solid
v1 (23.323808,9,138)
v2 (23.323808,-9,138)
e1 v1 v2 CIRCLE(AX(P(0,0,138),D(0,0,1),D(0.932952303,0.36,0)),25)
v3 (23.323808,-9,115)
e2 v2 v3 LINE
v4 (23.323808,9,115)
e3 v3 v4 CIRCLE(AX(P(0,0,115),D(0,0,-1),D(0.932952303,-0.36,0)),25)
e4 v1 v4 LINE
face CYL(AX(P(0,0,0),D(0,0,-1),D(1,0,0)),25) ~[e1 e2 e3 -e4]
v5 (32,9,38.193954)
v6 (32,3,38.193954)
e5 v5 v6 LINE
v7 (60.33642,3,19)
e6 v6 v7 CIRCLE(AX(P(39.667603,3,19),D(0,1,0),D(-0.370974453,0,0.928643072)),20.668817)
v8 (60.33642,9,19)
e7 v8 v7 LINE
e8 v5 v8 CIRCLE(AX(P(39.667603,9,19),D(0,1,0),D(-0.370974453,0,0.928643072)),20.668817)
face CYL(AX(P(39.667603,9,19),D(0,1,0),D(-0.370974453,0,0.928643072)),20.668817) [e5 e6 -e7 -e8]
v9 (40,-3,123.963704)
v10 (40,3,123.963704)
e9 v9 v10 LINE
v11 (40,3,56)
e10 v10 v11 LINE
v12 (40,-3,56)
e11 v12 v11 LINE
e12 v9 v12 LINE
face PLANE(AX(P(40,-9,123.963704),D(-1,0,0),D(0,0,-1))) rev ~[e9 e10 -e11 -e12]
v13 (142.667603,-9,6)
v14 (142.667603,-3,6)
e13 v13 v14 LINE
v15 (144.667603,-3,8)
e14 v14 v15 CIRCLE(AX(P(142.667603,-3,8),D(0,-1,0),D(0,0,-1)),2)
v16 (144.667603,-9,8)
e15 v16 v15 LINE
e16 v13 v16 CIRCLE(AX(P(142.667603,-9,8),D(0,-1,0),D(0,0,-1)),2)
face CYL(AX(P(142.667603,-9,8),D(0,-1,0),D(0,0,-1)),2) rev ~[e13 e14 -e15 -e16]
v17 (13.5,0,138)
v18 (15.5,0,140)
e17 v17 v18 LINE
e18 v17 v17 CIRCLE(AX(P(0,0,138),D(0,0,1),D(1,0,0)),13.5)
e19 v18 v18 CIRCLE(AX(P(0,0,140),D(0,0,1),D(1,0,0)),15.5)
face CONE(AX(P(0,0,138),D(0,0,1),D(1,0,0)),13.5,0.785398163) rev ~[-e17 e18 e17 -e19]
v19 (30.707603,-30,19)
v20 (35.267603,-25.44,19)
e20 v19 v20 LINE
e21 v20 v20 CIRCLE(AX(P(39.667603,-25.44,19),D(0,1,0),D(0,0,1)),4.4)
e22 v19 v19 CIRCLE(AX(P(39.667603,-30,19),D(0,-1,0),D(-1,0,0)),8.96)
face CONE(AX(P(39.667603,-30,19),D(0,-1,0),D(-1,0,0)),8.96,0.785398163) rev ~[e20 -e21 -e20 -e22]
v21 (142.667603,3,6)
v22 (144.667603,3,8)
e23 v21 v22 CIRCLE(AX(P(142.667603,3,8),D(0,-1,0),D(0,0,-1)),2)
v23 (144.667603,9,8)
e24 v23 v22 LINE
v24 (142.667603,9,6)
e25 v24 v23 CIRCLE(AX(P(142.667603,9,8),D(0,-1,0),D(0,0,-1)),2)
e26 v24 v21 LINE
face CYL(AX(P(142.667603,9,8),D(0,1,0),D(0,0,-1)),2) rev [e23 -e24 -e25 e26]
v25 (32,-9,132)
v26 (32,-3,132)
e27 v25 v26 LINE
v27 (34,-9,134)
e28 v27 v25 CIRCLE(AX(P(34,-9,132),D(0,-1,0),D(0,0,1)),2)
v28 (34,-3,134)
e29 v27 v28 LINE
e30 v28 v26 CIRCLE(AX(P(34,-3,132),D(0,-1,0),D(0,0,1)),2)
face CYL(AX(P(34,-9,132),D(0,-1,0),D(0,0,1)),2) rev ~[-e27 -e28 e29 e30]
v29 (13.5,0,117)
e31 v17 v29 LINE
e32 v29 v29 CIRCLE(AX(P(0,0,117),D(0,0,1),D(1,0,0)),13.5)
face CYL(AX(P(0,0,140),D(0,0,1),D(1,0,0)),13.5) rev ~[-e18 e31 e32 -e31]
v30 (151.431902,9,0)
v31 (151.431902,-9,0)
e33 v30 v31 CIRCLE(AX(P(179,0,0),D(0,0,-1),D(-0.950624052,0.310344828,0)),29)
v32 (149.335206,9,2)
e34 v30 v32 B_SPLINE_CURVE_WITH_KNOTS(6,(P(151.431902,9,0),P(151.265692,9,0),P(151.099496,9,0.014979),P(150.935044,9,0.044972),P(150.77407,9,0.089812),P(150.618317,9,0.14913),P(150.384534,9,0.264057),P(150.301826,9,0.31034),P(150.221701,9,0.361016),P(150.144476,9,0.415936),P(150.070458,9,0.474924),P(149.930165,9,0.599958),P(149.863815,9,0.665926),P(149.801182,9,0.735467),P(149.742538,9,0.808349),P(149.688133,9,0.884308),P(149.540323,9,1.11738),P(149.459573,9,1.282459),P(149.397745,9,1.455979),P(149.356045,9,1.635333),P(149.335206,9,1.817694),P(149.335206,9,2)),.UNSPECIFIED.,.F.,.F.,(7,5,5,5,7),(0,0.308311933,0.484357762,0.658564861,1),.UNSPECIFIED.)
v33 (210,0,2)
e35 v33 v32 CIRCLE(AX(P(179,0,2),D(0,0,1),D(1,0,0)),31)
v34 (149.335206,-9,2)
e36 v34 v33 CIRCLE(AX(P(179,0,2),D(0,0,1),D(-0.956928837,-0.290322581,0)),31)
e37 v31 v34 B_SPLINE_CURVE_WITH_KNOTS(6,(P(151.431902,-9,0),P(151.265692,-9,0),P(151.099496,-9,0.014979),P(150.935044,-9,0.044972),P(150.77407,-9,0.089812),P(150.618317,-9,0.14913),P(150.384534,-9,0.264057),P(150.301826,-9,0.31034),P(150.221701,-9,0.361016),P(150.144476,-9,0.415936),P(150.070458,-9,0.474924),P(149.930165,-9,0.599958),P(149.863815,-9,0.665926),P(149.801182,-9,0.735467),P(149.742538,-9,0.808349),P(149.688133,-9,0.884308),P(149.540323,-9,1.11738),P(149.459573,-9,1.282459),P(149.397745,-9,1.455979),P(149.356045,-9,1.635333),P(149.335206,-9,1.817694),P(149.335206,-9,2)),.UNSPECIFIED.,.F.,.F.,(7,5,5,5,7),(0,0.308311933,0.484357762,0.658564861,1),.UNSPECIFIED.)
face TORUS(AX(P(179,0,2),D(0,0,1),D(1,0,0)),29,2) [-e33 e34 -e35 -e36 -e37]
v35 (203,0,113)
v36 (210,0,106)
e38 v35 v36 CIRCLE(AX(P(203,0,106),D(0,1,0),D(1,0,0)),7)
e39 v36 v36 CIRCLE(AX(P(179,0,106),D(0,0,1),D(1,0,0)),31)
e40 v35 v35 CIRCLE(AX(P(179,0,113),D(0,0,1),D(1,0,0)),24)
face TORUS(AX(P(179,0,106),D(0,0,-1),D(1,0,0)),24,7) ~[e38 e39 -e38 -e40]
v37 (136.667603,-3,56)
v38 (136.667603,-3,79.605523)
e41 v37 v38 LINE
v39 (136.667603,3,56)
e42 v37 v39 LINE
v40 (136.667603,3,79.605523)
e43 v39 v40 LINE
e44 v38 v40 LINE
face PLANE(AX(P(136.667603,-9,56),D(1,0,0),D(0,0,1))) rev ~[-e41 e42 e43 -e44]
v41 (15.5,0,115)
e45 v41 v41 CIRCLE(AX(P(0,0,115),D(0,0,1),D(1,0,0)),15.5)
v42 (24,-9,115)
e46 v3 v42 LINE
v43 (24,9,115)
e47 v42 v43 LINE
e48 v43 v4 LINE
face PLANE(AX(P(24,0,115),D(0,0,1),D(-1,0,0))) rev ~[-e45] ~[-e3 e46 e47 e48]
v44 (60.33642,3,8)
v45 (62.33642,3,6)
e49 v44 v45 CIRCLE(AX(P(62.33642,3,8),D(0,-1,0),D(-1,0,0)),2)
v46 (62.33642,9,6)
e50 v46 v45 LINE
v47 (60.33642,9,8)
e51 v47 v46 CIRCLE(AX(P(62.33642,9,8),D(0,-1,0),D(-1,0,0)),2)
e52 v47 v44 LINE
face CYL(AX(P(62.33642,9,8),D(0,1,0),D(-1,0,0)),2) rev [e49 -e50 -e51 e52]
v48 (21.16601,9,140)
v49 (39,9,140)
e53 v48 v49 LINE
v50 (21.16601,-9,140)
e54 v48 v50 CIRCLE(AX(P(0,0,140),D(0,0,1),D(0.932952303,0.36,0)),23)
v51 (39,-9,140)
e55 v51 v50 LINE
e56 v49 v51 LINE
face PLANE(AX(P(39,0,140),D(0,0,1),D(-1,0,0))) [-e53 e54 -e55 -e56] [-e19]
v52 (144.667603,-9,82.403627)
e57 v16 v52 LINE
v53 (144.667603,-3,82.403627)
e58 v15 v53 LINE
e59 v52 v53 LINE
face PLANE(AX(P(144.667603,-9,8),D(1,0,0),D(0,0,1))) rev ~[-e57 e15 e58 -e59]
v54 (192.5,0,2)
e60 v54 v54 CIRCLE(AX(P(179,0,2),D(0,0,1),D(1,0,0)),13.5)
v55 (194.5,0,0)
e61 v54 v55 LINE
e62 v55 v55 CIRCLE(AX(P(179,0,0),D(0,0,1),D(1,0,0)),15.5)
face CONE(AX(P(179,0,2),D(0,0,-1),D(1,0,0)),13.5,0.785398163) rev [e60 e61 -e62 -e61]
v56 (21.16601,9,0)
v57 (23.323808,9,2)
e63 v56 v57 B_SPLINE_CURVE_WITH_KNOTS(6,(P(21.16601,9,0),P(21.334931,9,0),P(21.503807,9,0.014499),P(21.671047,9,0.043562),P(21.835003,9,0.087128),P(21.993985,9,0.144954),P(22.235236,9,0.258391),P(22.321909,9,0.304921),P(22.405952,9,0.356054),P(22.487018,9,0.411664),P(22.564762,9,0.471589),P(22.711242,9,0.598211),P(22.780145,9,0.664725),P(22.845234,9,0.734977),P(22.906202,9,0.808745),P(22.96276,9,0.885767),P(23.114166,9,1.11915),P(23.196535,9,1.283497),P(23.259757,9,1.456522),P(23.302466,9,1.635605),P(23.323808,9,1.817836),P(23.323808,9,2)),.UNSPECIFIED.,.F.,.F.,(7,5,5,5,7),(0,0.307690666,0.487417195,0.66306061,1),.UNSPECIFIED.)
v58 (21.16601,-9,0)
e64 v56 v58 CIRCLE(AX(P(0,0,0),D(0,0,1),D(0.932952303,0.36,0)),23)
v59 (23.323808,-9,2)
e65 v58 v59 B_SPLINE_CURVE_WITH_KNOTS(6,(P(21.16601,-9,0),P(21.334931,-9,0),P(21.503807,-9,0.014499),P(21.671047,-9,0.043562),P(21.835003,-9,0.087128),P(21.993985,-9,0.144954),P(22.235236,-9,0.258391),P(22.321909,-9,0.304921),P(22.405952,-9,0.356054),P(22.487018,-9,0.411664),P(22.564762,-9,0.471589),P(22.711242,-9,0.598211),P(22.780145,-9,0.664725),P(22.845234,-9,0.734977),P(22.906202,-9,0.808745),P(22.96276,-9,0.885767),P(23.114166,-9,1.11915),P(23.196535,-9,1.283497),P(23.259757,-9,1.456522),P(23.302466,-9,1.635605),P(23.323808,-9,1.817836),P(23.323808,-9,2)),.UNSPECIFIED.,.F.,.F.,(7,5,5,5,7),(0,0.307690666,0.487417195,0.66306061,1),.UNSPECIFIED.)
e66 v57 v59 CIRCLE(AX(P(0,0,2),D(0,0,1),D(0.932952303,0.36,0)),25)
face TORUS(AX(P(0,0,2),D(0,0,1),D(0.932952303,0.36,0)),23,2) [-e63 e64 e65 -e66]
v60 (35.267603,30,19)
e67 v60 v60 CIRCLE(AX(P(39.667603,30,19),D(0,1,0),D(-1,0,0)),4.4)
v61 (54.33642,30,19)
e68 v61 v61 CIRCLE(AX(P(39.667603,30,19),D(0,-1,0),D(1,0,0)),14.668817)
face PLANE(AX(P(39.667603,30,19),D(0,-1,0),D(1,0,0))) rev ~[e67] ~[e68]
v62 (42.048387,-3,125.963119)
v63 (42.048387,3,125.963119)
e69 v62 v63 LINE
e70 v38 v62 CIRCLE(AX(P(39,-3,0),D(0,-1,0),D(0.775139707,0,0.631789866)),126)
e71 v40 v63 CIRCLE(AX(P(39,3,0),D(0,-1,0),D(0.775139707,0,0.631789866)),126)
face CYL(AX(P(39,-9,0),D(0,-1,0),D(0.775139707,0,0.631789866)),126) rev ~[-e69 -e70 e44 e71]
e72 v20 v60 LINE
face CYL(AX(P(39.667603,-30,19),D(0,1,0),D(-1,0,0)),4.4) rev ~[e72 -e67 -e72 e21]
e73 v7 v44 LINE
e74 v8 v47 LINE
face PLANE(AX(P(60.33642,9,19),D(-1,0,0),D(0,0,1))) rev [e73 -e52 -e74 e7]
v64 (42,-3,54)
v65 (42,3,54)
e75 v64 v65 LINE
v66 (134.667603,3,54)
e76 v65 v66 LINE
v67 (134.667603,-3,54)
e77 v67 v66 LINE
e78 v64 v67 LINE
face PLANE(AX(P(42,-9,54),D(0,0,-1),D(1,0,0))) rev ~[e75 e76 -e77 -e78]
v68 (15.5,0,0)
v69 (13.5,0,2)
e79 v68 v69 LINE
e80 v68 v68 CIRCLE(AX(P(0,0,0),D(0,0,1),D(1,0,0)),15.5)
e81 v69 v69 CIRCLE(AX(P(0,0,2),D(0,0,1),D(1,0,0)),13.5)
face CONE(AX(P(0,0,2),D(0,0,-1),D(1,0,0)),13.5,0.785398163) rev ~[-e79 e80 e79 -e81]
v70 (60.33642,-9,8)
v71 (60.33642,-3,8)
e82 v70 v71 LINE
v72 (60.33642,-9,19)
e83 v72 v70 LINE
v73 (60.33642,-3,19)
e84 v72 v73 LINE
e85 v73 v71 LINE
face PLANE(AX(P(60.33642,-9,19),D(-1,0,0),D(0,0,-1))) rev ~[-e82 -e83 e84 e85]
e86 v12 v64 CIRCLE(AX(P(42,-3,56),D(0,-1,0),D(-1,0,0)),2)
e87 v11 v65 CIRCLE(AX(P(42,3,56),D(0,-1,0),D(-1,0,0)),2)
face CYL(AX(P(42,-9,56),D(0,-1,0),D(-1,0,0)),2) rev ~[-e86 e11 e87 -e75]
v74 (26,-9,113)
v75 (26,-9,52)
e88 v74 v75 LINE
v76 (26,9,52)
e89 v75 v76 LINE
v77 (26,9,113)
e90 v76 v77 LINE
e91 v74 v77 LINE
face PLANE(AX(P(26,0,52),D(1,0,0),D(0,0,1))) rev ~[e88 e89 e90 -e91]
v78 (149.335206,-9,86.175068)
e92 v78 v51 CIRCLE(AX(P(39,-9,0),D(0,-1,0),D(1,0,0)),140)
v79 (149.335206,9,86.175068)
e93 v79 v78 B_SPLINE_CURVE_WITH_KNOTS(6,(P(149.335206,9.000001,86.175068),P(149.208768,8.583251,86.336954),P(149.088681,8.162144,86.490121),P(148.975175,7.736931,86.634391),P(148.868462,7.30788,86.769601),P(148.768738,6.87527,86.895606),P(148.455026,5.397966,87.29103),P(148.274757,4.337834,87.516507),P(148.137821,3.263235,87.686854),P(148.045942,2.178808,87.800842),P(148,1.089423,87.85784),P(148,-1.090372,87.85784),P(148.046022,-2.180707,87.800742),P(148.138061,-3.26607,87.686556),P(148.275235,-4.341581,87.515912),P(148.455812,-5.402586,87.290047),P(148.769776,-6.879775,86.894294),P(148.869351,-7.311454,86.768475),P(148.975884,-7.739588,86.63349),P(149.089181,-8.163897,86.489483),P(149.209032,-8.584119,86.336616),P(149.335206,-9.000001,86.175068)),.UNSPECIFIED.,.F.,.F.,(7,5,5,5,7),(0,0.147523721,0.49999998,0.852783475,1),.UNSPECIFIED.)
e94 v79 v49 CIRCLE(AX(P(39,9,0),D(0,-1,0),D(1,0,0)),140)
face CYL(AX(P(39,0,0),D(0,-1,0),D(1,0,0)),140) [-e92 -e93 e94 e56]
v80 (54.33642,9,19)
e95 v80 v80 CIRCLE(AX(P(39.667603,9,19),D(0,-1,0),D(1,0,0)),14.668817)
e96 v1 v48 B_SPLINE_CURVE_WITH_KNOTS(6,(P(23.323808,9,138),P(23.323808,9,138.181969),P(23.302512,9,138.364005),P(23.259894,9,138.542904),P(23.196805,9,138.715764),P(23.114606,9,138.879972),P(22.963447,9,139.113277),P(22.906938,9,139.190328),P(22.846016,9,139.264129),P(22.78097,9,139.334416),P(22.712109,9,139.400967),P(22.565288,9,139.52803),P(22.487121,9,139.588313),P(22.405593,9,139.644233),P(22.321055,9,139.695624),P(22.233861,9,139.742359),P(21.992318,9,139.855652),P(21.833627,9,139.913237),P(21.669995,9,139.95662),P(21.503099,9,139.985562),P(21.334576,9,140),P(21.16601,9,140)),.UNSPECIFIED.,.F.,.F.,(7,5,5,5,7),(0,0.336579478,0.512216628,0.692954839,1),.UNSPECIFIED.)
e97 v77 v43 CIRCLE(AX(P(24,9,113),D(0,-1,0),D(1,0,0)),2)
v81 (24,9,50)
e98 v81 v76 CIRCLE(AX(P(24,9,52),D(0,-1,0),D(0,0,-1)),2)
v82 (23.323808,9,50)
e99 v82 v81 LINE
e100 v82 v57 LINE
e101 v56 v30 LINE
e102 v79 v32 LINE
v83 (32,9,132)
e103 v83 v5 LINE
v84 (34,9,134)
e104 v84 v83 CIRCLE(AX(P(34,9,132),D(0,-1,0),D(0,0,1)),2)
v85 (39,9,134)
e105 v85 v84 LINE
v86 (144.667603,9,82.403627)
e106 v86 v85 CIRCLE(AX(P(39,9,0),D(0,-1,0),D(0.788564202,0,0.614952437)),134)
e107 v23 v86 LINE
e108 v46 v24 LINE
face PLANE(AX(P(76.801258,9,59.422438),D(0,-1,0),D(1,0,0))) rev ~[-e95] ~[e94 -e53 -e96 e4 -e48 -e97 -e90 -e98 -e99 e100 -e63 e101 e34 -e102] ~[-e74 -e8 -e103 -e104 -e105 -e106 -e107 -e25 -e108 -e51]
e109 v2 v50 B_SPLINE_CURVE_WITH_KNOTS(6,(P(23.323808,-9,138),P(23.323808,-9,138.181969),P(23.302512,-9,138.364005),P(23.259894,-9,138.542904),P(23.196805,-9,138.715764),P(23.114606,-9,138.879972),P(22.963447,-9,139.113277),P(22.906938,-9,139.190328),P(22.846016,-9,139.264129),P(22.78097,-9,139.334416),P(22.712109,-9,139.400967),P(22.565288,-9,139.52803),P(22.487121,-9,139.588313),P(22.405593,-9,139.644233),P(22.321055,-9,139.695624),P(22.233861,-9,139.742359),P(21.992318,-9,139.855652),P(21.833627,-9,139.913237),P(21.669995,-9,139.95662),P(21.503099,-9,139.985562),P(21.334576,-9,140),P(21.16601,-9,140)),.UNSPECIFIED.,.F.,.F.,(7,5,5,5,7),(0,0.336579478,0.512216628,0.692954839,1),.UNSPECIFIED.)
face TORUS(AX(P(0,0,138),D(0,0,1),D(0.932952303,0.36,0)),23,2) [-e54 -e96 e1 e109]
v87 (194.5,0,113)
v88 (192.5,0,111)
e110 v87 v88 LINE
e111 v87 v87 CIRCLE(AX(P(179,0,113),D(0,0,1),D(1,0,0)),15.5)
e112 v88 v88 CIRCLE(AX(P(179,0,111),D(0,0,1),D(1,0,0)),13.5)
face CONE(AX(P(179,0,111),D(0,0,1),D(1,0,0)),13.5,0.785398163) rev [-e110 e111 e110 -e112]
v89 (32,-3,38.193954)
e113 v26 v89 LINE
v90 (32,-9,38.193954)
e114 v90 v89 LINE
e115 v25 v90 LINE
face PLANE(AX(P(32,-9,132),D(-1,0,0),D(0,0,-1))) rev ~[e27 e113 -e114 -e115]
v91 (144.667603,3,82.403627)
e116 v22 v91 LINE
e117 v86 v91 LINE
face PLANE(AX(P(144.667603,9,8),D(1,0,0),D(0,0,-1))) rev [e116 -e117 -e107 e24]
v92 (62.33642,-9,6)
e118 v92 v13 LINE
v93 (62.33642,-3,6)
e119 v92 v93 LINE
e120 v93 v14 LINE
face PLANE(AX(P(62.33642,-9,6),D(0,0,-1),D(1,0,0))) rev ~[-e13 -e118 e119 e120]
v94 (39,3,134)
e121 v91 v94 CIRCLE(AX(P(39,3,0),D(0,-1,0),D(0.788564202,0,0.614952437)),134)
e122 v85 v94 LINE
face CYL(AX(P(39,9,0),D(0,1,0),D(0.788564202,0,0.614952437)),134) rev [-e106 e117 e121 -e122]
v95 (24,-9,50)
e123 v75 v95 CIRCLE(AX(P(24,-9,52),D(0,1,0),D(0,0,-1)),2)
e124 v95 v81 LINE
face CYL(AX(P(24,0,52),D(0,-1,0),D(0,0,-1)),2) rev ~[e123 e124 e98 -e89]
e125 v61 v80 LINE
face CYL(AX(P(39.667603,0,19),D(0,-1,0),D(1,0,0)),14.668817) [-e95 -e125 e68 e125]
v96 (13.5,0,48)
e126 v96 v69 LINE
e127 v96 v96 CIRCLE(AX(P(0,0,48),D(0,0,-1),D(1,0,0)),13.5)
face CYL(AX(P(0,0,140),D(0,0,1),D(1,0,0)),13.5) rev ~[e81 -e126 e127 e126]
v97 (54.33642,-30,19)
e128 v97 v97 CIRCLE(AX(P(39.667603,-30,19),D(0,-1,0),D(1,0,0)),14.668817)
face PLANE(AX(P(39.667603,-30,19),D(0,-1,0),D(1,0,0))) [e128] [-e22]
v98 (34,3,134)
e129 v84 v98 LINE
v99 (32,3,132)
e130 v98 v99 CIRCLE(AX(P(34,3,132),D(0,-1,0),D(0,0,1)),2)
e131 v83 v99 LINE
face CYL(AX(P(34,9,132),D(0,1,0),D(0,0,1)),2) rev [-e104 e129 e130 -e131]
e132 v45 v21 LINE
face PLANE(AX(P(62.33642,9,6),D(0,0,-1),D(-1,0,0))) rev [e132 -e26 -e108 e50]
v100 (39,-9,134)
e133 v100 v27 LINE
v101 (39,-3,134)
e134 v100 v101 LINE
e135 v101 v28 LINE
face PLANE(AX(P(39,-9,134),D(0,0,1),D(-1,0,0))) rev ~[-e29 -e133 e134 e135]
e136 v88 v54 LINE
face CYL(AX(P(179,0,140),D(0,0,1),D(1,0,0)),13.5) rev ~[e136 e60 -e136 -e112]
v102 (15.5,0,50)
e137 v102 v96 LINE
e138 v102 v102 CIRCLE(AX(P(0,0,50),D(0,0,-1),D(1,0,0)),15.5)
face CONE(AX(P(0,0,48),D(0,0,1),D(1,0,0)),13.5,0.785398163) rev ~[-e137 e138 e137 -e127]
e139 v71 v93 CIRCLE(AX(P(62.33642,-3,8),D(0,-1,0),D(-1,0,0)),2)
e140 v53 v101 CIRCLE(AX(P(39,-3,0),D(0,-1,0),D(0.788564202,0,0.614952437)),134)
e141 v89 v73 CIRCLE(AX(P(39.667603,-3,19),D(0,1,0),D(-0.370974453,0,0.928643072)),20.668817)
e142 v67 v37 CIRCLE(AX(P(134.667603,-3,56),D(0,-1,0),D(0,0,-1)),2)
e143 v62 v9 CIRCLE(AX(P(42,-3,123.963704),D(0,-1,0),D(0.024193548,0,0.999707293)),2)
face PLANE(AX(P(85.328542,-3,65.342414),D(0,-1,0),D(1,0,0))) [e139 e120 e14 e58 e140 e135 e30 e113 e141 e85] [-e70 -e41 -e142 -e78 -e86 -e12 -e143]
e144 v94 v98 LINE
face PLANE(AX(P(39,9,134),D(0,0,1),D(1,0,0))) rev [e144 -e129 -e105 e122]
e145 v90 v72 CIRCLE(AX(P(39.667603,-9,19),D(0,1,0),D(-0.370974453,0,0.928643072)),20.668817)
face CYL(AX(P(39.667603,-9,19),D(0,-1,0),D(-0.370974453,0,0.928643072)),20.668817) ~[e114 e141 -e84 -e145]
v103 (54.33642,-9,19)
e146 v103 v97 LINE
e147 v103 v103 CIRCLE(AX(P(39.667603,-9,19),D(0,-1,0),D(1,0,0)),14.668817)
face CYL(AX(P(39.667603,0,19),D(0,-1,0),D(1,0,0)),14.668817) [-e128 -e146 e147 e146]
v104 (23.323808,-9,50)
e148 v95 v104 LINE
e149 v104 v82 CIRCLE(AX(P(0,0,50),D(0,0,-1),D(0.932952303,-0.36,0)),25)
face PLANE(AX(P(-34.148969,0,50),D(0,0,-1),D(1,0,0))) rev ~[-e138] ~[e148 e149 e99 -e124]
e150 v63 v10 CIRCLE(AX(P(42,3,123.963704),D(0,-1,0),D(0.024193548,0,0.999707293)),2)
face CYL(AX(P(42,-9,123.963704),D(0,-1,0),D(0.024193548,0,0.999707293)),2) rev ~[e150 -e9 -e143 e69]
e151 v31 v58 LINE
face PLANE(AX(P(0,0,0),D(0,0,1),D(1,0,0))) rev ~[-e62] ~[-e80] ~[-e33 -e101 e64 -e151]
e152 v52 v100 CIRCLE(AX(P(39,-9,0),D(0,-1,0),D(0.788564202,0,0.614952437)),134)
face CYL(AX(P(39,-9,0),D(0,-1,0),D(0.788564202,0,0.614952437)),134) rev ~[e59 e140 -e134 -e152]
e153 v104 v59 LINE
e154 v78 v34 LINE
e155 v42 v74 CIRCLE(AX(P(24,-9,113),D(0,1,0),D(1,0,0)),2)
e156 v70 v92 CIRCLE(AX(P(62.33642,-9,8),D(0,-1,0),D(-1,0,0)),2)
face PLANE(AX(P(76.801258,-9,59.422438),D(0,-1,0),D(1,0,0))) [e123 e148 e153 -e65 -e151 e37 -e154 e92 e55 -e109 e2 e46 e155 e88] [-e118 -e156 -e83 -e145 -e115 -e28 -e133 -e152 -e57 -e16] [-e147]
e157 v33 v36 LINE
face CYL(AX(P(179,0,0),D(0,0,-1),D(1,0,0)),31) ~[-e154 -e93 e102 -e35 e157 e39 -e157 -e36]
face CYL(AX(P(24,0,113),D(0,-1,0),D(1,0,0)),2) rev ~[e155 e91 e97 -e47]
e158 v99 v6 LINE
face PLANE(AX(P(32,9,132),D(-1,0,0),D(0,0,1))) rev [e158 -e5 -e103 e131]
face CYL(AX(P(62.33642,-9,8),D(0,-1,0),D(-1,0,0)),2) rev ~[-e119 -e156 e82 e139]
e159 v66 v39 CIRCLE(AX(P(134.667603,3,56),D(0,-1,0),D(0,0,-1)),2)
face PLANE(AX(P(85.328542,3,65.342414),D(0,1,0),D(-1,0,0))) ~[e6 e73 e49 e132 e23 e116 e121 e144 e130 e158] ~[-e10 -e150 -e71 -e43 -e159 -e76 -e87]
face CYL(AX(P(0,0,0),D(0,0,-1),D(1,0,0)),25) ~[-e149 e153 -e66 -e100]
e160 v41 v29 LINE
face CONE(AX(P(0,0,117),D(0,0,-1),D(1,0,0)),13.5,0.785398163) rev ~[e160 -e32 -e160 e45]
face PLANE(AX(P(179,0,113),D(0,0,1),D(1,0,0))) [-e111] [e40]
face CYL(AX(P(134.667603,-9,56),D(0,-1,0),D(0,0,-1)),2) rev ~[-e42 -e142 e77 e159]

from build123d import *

# Parameters (mm, degrees)
F3_R            = 25
F4_DEPTH        = 140
F5_R            = 31
F6_DEPTH        = 113
F8_DEPTH        = 9
F9_R            = 13.5
F10_DEPTH       = 140
F12_R           = 2
F13_R           = 7
F14_SIZE        = 2
F15_R           = 14.668816826
F16_DEPTH       = 30
F18_DEPTH       = 6
F20_D           = 8.8
F20_CSINK_D     = 17.92
F20_CSINK_ANGLE = 90
F22_DEPTH       = 40.0010001
F24_DEPTH       = 31.0010001
F24_DEPTH_BACK  = 25
F25_SIZE        = 2


# Not quite as in the source:
# - a pattern or mirror of a feature is missing from the dataset's text; its kind, count and spacing are read off the source's solid


with BuildPart() as f4:
    # F3 (on Top) → F4 (new body)
    with BuildSketch(Plane.XY):
        Circle(F3_R)
    extrude(amount=F4_DEPTH)



with BuildPart() as f6:
    # F5 (on Top) → F6 (new body)
    with BuildSketch(Plane.XY):
        with Locations((179, 0)):
            Circle(F5_R)
    extrude(amount=F6_DEPTH)


with BuildPart() as f4_1:
    add(f4.part)

    add(f6.part)  # F8 merges F6
    # F7 (on Front) → F8 (join, symmetric)
    with BuildSketch(Plane.XZ):
        with BuildLine():
            Line((0, 0), (179, 0))
            ThreePointArc((179, 0), (137.9949493661, 98.9949493661), (39, 140))
            Line((39, 140), (0, 140))
            Line((0, 140), (0, 0))
        make_face()
    extrude(amount=F8_DEPTH, both=True)

    # F9 (on face) → F10 (cut, through all)
    with BuildSketch(Plane.XY.offset(140)):
        Circle(F9_R)
        with Locations((179, 0)):
            Circle(F9_R)
    extrude(amount=-F10_DEPTH, mode=Mode.SUBTRACT)

    # F12
    f12_edges = [f4_1.edges().sort_by_distance(p)[0] for p in [
        (-25, 0, 140),
        (-25, 0, 0),
        (183.549252, 30.664382, 0),
        (183.549252, -30.664382, 0),
    ]]
    fillet(f12_edges, radius=F12_R)

    # F13
    f13_edges = [f4_1.edges().sort_by_distance(p)[0] for p in [
        (148, 0, 113),
    ]]
    fillet(f13_edges, radius=F13_R)

    # F14
    f14_edges = [f4_1.edges().sort_by_distance(p)[0] for p in [
        (-13.5, 0, 140),
        (-13.5, 0, 0),
        (165.5, 0, 113),
        (165.5, 0, 0),
    ]]
    chamfer(f14_edges, length=F14_SIZE)

    # F15 (on Front) → F16 (join, symmetric)
    with BuildSketch(Plane.XZ):
        with Locations((39.6676030258, 19)):
            Circle(F15_R)
    extrude(amount=F16_DEPTH, both=True)

    # F17 (on face) → F18 (cut)
    with BuildSketch(Plane.XZ.offset(9)):
        with BuildLine():
            ThreePointArc((34, 134), (32.5857864376, 133.4142135624), (32, 132))
            Line((32, 132), (32, 38.1939535486))
            ThreePointArc((32, 38.1939535486), (51.2589728015, 36.1125724458), (60.3364198518, 19))
            Line((60.3364198518, 19), (60.3364198518, 8))
            ThreePointArc((60.3364198518, 8), (60.9222062895, 6.5857864376), (62.3364198518, 6))
            Line((62.3364198518, 6), (142.6676030258, 6))
            ThreePointArc((142.6676030258, 6), (144.0818165882, 6.5857864376), (144.6676030258, 8))
            Line((144.6676030258, 8), (144.6676030258, 82.4036265633))
            ThreePointArc((144.6676030258, 82.4036265633), (97.795892886, 120.411971912), (39, 134))
            Line((39, 134), (34, 134))
        make_face()
    f18 = extrude(amount=-F18_DEPTH, mode=Mode.SUBTRACT)

    # F18_copies: F18 across plane
    add(f18.mirror(Plane.ZX), mode=Mode.SUBTRACT)

    # F20 (through all)
    with Locations(Plane.XZ.offset(30)):
        with Locations((39.6676030258, 19)):
            CounterSinkHole(F20_D / 2, F20_CSINK_D / 2, counter_sink_angle=F20_CSINK_ANGLE)

    # F21 (on face) → F22 (cut, through all)
    with BuildSketch(Plane.XZ.offset(9)):
        with BuildLine():
            ThreePointArc((134.6676030258, 54), (136.0818165882, 54.5857864376), (136.6676030258, 56))
            Line((136.6676030258, 56), (136.6676030258, 79.6055231701))
            ThreePointArc((136.6676030258, 79.6055231701), (94.4363088441, 113.14952789), (42.0483870968, 125.963118952))
            ThreePointArc((42.0483870968, 125.963118952), (40.602998603, 125.3949231107), (40, 123.9637043654))
            Line((40, 123.9637043654), (40, 56))
            ThreePointArc((40, 56), (40.5857864376, 54.5857864376), (42, 54))
            Line((42, 54), (134.6676030258, 54))
        make_face()
    extrude(amount=-F22_DEPTH, mode=Mode.SUBTRACT)

    # F23 (on Front) → F24 (cut, two sides)
    with BuildSketch(Plane.XZ) as f24_sk:
        with BuildLine():
            Line((-34.1489688568, 115), (-34.1489688568, 50))
            Line((-34.1489688568, 50), (24, 50))
            ThreePointArc((24, 50), (25.4142135624, 50.5857864376), (26, 52))
            Line((26, 52), (26, 113))
            ThreePointArc((26, 113), (25.4142135624, 114.4142135624), (24, 115))
            Line((24, 115), (-34.1489688568, 115))
        make_face()
    extrude(amount=-F24_DEPTH, mode=Mode.SUBTRACT)
    extrude(f24_sk.sketch, amount=F24_DEPTH_BACK, mode=Mode.SUBTRACT)

    # F25
    f25_edges = [f4_1.edges().sort_by_distance(p)[0] for p in [
        (-13.5, 0, 50),
        (-13.5, 0, 115),
    ]]
    chamfer(f25_edges, length=F25_SIZE)


solid = f4_1.part
